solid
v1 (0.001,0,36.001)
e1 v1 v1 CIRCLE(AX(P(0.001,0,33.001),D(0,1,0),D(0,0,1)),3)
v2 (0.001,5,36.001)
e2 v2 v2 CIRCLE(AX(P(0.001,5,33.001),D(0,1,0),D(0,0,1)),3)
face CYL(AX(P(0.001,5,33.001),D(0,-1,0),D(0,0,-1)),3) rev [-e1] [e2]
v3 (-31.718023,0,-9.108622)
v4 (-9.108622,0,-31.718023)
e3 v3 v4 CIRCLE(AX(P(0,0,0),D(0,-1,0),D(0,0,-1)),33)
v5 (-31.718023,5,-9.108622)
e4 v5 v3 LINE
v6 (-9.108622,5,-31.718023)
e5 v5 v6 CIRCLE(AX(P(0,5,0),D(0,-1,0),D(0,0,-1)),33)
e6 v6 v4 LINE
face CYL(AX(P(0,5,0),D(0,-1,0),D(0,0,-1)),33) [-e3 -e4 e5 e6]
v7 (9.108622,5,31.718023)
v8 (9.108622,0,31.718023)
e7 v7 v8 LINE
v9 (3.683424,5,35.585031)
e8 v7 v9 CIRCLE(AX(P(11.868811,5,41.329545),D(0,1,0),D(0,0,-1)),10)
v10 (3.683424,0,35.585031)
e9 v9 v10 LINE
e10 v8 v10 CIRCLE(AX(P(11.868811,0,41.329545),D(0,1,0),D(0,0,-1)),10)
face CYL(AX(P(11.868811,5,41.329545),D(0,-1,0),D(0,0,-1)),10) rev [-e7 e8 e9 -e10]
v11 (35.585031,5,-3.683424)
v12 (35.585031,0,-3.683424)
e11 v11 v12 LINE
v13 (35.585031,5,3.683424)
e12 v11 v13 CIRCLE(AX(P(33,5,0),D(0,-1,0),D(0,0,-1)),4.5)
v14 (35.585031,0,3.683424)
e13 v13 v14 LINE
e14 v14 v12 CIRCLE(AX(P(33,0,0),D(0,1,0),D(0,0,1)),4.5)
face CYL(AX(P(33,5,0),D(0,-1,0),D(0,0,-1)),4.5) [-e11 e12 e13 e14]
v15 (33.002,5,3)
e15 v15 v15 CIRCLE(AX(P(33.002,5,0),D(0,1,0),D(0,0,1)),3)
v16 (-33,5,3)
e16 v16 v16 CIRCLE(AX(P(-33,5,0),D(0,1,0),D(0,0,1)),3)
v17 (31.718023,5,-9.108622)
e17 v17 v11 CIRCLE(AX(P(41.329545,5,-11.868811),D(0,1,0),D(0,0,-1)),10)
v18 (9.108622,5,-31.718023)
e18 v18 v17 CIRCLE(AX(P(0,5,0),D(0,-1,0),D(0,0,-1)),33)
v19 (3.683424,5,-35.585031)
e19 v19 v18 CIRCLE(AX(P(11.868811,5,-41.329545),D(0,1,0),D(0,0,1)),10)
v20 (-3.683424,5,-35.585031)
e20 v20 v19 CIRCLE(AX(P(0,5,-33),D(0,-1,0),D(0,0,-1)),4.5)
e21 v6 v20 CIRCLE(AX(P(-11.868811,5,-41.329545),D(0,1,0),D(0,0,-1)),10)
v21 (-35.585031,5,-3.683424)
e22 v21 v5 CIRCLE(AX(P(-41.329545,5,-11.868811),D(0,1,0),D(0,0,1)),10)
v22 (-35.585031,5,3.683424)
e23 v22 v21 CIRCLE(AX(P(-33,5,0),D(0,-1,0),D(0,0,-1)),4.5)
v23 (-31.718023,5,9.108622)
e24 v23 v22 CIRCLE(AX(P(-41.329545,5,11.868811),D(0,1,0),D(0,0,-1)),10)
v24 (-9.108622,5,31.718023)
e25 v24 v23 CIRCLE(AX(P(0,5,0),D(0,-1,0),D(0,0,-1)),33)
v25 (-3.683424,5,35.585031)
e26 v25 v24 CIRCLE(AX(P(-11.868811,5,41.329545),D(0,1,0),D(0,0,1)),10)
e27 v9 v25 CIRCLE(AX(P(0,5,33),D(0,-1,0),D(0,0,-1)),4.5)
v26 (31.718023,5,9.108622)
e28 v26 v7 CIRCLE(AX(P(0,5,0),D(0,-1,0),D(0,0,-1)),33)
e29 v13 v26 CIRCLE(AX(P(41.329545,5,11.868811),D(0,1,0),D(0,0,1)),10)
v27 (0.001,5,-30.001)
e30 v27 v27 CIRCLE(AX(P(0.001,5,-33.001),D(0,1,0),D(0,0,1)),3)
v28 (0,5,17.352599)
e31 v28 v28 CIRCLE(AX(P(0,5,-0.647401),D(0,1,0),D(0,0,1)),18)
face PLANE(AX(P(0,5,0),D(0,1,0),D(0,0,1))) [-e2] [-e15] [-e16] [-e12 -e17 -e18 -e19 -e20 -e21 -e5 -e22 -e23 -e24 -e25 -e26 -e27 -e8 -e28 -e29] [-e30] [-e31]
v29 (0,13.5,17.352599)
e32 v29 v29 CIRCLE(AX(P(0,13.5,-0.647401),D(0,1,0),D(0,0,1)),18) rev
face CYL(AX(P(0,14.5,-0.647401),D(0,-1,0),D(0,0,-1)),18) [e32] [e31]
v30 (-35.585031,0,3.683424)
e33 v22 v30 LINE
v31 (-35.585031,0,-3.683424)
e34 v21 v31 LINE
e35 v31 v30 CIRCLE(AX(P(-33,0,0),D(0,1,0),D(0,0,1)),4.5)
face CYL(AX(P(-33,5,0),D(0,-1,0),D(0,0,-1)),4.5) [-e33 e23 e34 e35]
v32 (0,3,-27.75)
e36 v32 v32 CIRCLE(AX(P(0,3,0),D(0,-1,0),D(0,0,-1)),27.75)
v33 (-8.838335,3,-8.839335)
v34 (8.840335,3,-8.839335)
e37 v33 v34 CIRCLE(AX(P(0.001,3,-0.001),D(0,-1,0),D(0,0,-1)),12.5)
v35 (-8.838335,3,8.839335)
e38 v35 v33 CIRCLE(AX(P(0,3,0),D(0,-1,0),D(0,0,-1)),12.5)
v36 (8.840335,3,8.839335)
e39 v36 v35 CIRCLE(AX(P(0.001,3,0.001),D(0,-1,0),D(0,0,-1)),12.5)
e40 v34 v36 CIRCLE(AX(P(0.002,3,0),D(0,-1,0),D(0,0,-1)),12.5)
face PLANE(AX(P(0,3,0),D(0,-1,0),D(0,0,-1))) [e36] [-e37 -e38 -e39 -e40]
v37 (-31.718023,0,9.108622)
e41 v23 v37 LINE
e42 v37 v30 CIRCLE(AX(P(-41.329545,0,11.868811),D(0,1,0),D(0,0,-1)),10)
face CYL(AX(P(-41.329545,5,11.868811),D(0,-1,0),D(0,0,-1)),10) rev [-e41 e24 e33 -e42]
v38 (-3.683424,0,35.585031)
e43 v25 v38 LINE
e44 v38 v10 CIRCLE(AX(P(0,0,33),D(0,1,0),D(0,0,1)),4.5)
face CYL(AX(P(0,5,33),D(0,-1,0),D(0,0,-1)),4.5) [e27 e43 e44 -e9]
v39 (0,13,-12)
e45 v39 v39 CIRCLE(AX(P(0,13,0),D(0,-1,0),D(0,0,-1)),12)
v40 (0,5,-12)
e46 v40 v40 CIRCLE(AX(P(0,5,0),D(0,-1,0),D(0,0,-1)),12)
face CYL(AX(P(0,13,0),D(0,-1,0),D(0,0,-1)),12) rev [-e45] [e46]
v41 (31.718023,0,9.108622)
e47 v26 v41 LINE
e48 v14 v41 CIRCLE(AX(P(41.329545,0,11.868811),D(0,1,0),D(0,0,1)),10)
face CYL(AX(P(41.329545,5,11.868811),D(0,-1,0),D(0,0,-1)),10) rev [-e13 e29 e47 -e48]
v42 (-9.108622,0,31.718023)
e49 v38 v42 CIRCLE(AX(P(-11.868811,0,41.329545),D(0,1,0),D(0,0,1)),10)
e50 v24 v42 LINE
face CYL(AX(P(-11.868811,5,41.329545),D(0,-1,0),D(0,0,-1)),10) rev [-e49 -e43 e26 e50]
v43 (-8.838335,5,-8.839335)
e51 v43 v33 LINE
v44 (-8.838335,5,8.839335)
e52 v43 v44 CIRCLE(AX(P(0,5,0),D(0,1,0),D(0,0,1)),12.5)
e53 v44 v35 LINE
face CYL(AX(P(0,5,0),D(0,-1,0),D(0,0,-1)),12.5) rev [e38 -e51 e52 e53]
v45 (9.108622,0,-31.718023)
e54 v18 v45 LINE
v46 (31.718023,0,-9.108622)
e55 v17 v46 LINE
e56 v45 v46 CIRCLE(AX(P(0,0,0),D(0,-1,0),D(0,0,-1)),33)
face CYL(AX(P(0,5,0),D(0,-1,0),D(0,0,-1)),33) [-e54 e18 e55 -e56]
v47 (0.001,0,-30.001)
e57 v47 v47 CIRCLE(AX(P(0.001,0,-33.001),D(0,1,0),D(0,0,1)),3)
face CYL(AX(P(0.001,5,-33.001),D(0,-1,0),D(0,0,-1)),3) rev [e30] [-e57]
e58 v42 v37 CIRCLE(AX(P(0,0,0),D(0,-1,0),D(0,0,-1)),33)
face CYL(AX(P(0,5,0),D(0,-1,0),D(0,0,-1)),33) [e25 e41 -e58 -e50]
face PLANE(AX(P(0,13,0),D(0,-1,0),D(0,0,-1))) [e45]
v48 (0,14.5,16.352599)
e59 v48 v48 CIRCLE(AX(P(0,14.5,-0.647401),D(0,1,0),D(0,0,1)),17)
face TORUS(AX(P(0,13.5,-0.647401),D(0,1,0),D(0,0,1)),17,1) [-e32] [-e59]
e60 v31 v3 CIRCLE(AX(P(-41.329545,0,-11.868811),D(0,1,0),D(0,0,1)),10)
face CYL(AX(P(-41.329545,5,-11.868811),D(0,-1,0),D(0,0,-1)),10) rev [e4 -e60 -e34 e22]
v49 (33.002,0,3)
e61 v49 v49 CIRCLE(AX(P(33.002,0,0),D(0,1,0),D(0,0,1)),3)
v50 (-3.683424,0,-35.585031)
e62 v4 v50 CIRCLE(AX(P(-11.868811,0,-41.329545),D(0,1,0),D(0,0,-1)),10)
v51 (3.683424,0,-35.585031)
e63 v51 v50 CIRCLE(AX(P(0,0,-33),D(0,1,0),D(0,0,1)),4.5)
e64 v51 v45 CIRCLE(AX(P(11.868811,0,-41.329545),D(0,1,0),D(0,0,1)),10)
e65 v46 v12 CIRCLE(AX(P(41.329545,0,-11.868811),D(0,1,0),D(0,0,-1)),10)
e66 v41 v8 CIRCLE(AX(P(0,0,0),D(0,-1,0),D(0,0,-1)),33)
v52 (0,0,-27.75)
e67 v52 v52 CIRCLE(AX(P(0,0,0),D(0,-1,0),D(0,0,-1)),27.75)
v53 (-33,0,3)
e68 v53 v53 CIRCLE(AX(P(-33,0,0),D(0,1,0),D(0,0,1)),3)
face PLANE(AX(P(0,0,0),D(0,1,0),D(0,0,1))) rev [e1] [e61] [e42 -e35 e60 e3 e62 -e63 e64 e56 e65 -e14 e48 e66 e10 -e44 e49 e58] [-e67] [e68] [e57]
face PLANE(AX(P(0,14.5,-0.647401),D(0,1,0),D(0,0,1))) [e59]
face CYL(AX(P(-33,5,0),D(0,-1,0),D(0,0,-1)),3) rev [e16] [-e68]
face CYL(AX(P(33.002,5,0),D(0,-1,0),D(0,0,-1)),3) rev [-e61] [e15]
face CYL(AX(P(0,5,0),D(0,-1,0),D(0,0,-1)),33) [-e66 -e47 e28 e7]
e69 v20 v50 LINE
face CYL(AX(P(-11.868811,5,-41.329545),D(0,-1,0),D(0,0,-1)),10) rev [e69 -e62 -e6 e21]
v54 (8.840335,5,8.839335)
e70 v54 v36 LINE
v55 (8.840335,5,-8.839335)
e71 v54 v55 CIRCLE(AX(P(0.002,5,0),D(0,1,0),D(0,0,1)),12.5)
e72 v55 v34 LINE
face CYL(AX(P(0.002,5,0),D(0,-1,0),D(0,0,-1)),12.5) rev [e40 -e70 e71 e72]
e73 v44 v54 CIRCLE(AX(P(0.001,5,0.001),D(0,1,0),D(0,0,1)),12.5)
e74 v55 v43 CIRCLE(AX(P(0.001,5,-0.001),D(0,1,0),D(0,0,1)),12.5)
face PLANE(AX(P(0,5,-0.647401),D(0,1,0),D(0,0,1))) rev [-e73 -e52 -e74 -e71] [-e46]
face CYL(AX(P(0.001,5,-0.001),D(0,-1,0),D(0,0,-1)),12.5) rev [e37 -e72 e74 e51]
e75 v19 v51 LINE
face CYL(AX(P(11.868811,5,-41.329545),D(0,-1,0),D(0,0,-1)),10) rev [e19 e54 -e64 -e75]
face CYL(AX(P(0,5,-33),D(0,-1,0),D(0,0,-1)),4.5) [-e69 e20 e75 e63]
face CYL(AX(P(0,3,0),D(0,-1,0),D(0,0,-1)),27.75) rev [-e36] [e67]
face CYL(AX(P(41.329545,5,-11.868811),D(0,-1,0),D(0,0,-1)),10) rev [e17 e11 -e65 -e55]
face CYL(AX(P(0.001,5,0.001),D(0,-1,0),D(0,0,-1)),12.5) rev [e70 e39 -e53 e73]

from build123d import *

# Parameters (mm, degrees)
BOSS_EXTRUDE1_OUTLINE_W = 75
BOSS_EXTRUDE1_OUTLINE_H = 75
BOSS_EXTRUDE1_OUTLINE_R = 3
BOSS_EXTRUDE1_DEPTH     = 5
SKETCH2_R               = 27.75
CUT_EXTRUDE1_DEPTH      = 3
SKETCH3_OUTSIDE_W       = 98.236
SKETCH3_OUTSIDE_H       = 98.236
CUT_EXTRUDE5_DEPTH      = 5
SKETCH4_R               = 18
BOSS_EXTRUDE2_DEPTH     = 9.5
SKETCH5_R               = 12
CUT_EXTRUDE6_DEPTH      = 8
FILLET1_R               = 1


# Read off the part's stored shape, not the designer's step: Boss-Extrude1
with BuildPart() as part:
    # Boss-Extrude1 outline → Boss-Extrude1 (new body)
    with BuildSketch(Plane(origin=(0, 0, 0), x_dir=(1, 0, 0), z_dir=(0, 1, 0))):
        Rectangle(BOSS_EXTRUDE1_OUTLINE_W, BOSS_EXTRUDE1_OUTLINE_H)
        with Locations((0.001, -33.001)):
            Circle(BOSS_EXTRUDE1_OUTLINE_R, mode=Mode.SUBTRACT)
        with Locations((-33, 0)):
            Circle(BOSS_EXTRUDE1_OUTLINE_R, mode=Mode.SUBTRACT)
        with BuildLine():
            ThreePointArc((8.840334751, 8.839334751), (12.502, 0), (8.840334751, -8.839334751))
            ThreePointArc((8.840334751, -8.839334751), (0.001, -12.501), (-8.838334751, -8.839334751))
            ThreePointArc((-8.838334751, -8.839334751), (-12.5, 0), (-8.838334751, 8.839334751))
            ThreePointArc((-8.838334751, 8.839334751), (0.001, 12.501), (8.840334751, 8.839334751))
        make_face(mode=Mode.SUBTRACT)
        with Locations((33.002, 0)):
            Circle(BOSS_EXTRUDE1_OUTLINE_R, mode=Mode.SUBTRACT)
        with Locations((0.001, 33.001)):
            Circle(BOSS_EXTRUDE1_OUTLINE_R, mode=Mode.SUBTRACT)
    extrude(amount=BOSS_EXTRUDE1_DEPTH)

    # Sketch2 → Cut-Extrude1 (cut)
    with BuildSketch(Plane.XZ):
        with Locations(Location((0, 0, 0), (0, 0, 270))):
            Circle(SKETCH2_R)
    extrude(amount=-CUT_EXTRUDE1_DEPTH, mode=Mode.SUBTRACT)

    # Sketch3 outside → Cut-Extrude5 (cut)
    with BuildSketch(Plane.XZ):
        Rectangle(SKETCH3_OUTSIDE_W, SKETCH3_OUTSIDE_H)
        with BuildLine():
            ThreePointArc((-31.718023256, -9.10862233), (-23.334523779, -23.334523779), (-9.10862233, -31.718023256))
            ThreePointArc((-9.10862233, -31.718023256), (-6.064515675, -33.186440594), (-3.683424077, -35.585031348))
            ThreePointArc((-3.683424077, -35.585031348), (0, -37.5), (3.683424077, -35.585031348))
            ThreePointArc((3.683424077, -35.585031348), (6.064515675, -33.186440594), (9.10862233, -31.718023256))
            ThreePointArc((9.10862233, -31.718023256), (23.334523779, -23.334523779), (31.718023256, -9.10862233))
            ThreePointArc((31.718023256, -9.10862233), (33.186440594, -6.064515675), (35.585031348, -3.683424077))
            ThreePointArc((35.585031348, -3.683424077), (37.5, 0), (35.585031348, 3.683424077))
            ThreePointArc((35.585031348, 3.683424077), (33.186440594, 6.064515675), (31.718023256, 9.10862233))
            ThreePointArc((31.718023256, 9.10862233), (23.334523779, 23.334523779), (9.10862233, 31.718023256))
            ThreePointArc((9.10862233, 31.718023256), (6.064515675, 33.186440594), (3.683424077, 35.585031348))
            ThreePointArc((3.683424077, 35.585031348), (0, 37.5), (-3.683424077, 35.585031348))
            ThreePointArc((-3.683424077, 35.585031348), (-6.064515675, 33.186440594), (-9.10862233, 31.718023256))
            ThreePointArc((-9.10862233, 31.718023256), (-23.334523779, 23.334523779), (-31.718023256, 9.10862233))
            ThreePointArc((-31.718023256, 9.10862233), (-33.186440594, 6.064515675), (-35.585031348, 3.683424077))
            ThreePointArc((-35.585031348, 3.683424077), (-37.5, 0), (-35.585031348, -3.683424077))
            ThreePointArc((-35.585031348, -3.683424077), (-33.186440594, -6.064515675), (-31.718023256, -9.10862233))
        make_face(mode=Mode.SUBTRACT)
    extrude(amount=-CUT_EXTRUDE5_DEPTH, mode=Mode.SUBTRACT)

    # Sketch4 → Boss-Extrude2 (add)
    with BuildSketch(Plane(origin=(0, 5, 0), x_dir=(1, 0, 0), z_dir=(0, 1, 0))):
        with Locations(Location((0, 0.647401089, 0), (0, 0, 270))):
            Circle(SKETCH4_R)
    extrude(amount=BOSS_EXTRUDE2_DEPTH)

    # Sketch5 → Cut-Extrude6 (cut)
    with BuildSketch(Plane.XZ.offset(-5)):
        with Locations(Location((0, 0, 0), (0, 0, 270))):
            Circle(SKETCH5_R)
    extrude(amount=-CUT_EXTRUDE6_DEPTH, mode=Mode.SUBTRACT)

    # Fillet1
    fillet1_edges = [part.edges().sort_by_distance(p)[0] for p in [
        (0, 14.5, -18.647401089),
    ]]
    fillet(fillet1_edges, radius=FILLET1_R)


solid = part.part
